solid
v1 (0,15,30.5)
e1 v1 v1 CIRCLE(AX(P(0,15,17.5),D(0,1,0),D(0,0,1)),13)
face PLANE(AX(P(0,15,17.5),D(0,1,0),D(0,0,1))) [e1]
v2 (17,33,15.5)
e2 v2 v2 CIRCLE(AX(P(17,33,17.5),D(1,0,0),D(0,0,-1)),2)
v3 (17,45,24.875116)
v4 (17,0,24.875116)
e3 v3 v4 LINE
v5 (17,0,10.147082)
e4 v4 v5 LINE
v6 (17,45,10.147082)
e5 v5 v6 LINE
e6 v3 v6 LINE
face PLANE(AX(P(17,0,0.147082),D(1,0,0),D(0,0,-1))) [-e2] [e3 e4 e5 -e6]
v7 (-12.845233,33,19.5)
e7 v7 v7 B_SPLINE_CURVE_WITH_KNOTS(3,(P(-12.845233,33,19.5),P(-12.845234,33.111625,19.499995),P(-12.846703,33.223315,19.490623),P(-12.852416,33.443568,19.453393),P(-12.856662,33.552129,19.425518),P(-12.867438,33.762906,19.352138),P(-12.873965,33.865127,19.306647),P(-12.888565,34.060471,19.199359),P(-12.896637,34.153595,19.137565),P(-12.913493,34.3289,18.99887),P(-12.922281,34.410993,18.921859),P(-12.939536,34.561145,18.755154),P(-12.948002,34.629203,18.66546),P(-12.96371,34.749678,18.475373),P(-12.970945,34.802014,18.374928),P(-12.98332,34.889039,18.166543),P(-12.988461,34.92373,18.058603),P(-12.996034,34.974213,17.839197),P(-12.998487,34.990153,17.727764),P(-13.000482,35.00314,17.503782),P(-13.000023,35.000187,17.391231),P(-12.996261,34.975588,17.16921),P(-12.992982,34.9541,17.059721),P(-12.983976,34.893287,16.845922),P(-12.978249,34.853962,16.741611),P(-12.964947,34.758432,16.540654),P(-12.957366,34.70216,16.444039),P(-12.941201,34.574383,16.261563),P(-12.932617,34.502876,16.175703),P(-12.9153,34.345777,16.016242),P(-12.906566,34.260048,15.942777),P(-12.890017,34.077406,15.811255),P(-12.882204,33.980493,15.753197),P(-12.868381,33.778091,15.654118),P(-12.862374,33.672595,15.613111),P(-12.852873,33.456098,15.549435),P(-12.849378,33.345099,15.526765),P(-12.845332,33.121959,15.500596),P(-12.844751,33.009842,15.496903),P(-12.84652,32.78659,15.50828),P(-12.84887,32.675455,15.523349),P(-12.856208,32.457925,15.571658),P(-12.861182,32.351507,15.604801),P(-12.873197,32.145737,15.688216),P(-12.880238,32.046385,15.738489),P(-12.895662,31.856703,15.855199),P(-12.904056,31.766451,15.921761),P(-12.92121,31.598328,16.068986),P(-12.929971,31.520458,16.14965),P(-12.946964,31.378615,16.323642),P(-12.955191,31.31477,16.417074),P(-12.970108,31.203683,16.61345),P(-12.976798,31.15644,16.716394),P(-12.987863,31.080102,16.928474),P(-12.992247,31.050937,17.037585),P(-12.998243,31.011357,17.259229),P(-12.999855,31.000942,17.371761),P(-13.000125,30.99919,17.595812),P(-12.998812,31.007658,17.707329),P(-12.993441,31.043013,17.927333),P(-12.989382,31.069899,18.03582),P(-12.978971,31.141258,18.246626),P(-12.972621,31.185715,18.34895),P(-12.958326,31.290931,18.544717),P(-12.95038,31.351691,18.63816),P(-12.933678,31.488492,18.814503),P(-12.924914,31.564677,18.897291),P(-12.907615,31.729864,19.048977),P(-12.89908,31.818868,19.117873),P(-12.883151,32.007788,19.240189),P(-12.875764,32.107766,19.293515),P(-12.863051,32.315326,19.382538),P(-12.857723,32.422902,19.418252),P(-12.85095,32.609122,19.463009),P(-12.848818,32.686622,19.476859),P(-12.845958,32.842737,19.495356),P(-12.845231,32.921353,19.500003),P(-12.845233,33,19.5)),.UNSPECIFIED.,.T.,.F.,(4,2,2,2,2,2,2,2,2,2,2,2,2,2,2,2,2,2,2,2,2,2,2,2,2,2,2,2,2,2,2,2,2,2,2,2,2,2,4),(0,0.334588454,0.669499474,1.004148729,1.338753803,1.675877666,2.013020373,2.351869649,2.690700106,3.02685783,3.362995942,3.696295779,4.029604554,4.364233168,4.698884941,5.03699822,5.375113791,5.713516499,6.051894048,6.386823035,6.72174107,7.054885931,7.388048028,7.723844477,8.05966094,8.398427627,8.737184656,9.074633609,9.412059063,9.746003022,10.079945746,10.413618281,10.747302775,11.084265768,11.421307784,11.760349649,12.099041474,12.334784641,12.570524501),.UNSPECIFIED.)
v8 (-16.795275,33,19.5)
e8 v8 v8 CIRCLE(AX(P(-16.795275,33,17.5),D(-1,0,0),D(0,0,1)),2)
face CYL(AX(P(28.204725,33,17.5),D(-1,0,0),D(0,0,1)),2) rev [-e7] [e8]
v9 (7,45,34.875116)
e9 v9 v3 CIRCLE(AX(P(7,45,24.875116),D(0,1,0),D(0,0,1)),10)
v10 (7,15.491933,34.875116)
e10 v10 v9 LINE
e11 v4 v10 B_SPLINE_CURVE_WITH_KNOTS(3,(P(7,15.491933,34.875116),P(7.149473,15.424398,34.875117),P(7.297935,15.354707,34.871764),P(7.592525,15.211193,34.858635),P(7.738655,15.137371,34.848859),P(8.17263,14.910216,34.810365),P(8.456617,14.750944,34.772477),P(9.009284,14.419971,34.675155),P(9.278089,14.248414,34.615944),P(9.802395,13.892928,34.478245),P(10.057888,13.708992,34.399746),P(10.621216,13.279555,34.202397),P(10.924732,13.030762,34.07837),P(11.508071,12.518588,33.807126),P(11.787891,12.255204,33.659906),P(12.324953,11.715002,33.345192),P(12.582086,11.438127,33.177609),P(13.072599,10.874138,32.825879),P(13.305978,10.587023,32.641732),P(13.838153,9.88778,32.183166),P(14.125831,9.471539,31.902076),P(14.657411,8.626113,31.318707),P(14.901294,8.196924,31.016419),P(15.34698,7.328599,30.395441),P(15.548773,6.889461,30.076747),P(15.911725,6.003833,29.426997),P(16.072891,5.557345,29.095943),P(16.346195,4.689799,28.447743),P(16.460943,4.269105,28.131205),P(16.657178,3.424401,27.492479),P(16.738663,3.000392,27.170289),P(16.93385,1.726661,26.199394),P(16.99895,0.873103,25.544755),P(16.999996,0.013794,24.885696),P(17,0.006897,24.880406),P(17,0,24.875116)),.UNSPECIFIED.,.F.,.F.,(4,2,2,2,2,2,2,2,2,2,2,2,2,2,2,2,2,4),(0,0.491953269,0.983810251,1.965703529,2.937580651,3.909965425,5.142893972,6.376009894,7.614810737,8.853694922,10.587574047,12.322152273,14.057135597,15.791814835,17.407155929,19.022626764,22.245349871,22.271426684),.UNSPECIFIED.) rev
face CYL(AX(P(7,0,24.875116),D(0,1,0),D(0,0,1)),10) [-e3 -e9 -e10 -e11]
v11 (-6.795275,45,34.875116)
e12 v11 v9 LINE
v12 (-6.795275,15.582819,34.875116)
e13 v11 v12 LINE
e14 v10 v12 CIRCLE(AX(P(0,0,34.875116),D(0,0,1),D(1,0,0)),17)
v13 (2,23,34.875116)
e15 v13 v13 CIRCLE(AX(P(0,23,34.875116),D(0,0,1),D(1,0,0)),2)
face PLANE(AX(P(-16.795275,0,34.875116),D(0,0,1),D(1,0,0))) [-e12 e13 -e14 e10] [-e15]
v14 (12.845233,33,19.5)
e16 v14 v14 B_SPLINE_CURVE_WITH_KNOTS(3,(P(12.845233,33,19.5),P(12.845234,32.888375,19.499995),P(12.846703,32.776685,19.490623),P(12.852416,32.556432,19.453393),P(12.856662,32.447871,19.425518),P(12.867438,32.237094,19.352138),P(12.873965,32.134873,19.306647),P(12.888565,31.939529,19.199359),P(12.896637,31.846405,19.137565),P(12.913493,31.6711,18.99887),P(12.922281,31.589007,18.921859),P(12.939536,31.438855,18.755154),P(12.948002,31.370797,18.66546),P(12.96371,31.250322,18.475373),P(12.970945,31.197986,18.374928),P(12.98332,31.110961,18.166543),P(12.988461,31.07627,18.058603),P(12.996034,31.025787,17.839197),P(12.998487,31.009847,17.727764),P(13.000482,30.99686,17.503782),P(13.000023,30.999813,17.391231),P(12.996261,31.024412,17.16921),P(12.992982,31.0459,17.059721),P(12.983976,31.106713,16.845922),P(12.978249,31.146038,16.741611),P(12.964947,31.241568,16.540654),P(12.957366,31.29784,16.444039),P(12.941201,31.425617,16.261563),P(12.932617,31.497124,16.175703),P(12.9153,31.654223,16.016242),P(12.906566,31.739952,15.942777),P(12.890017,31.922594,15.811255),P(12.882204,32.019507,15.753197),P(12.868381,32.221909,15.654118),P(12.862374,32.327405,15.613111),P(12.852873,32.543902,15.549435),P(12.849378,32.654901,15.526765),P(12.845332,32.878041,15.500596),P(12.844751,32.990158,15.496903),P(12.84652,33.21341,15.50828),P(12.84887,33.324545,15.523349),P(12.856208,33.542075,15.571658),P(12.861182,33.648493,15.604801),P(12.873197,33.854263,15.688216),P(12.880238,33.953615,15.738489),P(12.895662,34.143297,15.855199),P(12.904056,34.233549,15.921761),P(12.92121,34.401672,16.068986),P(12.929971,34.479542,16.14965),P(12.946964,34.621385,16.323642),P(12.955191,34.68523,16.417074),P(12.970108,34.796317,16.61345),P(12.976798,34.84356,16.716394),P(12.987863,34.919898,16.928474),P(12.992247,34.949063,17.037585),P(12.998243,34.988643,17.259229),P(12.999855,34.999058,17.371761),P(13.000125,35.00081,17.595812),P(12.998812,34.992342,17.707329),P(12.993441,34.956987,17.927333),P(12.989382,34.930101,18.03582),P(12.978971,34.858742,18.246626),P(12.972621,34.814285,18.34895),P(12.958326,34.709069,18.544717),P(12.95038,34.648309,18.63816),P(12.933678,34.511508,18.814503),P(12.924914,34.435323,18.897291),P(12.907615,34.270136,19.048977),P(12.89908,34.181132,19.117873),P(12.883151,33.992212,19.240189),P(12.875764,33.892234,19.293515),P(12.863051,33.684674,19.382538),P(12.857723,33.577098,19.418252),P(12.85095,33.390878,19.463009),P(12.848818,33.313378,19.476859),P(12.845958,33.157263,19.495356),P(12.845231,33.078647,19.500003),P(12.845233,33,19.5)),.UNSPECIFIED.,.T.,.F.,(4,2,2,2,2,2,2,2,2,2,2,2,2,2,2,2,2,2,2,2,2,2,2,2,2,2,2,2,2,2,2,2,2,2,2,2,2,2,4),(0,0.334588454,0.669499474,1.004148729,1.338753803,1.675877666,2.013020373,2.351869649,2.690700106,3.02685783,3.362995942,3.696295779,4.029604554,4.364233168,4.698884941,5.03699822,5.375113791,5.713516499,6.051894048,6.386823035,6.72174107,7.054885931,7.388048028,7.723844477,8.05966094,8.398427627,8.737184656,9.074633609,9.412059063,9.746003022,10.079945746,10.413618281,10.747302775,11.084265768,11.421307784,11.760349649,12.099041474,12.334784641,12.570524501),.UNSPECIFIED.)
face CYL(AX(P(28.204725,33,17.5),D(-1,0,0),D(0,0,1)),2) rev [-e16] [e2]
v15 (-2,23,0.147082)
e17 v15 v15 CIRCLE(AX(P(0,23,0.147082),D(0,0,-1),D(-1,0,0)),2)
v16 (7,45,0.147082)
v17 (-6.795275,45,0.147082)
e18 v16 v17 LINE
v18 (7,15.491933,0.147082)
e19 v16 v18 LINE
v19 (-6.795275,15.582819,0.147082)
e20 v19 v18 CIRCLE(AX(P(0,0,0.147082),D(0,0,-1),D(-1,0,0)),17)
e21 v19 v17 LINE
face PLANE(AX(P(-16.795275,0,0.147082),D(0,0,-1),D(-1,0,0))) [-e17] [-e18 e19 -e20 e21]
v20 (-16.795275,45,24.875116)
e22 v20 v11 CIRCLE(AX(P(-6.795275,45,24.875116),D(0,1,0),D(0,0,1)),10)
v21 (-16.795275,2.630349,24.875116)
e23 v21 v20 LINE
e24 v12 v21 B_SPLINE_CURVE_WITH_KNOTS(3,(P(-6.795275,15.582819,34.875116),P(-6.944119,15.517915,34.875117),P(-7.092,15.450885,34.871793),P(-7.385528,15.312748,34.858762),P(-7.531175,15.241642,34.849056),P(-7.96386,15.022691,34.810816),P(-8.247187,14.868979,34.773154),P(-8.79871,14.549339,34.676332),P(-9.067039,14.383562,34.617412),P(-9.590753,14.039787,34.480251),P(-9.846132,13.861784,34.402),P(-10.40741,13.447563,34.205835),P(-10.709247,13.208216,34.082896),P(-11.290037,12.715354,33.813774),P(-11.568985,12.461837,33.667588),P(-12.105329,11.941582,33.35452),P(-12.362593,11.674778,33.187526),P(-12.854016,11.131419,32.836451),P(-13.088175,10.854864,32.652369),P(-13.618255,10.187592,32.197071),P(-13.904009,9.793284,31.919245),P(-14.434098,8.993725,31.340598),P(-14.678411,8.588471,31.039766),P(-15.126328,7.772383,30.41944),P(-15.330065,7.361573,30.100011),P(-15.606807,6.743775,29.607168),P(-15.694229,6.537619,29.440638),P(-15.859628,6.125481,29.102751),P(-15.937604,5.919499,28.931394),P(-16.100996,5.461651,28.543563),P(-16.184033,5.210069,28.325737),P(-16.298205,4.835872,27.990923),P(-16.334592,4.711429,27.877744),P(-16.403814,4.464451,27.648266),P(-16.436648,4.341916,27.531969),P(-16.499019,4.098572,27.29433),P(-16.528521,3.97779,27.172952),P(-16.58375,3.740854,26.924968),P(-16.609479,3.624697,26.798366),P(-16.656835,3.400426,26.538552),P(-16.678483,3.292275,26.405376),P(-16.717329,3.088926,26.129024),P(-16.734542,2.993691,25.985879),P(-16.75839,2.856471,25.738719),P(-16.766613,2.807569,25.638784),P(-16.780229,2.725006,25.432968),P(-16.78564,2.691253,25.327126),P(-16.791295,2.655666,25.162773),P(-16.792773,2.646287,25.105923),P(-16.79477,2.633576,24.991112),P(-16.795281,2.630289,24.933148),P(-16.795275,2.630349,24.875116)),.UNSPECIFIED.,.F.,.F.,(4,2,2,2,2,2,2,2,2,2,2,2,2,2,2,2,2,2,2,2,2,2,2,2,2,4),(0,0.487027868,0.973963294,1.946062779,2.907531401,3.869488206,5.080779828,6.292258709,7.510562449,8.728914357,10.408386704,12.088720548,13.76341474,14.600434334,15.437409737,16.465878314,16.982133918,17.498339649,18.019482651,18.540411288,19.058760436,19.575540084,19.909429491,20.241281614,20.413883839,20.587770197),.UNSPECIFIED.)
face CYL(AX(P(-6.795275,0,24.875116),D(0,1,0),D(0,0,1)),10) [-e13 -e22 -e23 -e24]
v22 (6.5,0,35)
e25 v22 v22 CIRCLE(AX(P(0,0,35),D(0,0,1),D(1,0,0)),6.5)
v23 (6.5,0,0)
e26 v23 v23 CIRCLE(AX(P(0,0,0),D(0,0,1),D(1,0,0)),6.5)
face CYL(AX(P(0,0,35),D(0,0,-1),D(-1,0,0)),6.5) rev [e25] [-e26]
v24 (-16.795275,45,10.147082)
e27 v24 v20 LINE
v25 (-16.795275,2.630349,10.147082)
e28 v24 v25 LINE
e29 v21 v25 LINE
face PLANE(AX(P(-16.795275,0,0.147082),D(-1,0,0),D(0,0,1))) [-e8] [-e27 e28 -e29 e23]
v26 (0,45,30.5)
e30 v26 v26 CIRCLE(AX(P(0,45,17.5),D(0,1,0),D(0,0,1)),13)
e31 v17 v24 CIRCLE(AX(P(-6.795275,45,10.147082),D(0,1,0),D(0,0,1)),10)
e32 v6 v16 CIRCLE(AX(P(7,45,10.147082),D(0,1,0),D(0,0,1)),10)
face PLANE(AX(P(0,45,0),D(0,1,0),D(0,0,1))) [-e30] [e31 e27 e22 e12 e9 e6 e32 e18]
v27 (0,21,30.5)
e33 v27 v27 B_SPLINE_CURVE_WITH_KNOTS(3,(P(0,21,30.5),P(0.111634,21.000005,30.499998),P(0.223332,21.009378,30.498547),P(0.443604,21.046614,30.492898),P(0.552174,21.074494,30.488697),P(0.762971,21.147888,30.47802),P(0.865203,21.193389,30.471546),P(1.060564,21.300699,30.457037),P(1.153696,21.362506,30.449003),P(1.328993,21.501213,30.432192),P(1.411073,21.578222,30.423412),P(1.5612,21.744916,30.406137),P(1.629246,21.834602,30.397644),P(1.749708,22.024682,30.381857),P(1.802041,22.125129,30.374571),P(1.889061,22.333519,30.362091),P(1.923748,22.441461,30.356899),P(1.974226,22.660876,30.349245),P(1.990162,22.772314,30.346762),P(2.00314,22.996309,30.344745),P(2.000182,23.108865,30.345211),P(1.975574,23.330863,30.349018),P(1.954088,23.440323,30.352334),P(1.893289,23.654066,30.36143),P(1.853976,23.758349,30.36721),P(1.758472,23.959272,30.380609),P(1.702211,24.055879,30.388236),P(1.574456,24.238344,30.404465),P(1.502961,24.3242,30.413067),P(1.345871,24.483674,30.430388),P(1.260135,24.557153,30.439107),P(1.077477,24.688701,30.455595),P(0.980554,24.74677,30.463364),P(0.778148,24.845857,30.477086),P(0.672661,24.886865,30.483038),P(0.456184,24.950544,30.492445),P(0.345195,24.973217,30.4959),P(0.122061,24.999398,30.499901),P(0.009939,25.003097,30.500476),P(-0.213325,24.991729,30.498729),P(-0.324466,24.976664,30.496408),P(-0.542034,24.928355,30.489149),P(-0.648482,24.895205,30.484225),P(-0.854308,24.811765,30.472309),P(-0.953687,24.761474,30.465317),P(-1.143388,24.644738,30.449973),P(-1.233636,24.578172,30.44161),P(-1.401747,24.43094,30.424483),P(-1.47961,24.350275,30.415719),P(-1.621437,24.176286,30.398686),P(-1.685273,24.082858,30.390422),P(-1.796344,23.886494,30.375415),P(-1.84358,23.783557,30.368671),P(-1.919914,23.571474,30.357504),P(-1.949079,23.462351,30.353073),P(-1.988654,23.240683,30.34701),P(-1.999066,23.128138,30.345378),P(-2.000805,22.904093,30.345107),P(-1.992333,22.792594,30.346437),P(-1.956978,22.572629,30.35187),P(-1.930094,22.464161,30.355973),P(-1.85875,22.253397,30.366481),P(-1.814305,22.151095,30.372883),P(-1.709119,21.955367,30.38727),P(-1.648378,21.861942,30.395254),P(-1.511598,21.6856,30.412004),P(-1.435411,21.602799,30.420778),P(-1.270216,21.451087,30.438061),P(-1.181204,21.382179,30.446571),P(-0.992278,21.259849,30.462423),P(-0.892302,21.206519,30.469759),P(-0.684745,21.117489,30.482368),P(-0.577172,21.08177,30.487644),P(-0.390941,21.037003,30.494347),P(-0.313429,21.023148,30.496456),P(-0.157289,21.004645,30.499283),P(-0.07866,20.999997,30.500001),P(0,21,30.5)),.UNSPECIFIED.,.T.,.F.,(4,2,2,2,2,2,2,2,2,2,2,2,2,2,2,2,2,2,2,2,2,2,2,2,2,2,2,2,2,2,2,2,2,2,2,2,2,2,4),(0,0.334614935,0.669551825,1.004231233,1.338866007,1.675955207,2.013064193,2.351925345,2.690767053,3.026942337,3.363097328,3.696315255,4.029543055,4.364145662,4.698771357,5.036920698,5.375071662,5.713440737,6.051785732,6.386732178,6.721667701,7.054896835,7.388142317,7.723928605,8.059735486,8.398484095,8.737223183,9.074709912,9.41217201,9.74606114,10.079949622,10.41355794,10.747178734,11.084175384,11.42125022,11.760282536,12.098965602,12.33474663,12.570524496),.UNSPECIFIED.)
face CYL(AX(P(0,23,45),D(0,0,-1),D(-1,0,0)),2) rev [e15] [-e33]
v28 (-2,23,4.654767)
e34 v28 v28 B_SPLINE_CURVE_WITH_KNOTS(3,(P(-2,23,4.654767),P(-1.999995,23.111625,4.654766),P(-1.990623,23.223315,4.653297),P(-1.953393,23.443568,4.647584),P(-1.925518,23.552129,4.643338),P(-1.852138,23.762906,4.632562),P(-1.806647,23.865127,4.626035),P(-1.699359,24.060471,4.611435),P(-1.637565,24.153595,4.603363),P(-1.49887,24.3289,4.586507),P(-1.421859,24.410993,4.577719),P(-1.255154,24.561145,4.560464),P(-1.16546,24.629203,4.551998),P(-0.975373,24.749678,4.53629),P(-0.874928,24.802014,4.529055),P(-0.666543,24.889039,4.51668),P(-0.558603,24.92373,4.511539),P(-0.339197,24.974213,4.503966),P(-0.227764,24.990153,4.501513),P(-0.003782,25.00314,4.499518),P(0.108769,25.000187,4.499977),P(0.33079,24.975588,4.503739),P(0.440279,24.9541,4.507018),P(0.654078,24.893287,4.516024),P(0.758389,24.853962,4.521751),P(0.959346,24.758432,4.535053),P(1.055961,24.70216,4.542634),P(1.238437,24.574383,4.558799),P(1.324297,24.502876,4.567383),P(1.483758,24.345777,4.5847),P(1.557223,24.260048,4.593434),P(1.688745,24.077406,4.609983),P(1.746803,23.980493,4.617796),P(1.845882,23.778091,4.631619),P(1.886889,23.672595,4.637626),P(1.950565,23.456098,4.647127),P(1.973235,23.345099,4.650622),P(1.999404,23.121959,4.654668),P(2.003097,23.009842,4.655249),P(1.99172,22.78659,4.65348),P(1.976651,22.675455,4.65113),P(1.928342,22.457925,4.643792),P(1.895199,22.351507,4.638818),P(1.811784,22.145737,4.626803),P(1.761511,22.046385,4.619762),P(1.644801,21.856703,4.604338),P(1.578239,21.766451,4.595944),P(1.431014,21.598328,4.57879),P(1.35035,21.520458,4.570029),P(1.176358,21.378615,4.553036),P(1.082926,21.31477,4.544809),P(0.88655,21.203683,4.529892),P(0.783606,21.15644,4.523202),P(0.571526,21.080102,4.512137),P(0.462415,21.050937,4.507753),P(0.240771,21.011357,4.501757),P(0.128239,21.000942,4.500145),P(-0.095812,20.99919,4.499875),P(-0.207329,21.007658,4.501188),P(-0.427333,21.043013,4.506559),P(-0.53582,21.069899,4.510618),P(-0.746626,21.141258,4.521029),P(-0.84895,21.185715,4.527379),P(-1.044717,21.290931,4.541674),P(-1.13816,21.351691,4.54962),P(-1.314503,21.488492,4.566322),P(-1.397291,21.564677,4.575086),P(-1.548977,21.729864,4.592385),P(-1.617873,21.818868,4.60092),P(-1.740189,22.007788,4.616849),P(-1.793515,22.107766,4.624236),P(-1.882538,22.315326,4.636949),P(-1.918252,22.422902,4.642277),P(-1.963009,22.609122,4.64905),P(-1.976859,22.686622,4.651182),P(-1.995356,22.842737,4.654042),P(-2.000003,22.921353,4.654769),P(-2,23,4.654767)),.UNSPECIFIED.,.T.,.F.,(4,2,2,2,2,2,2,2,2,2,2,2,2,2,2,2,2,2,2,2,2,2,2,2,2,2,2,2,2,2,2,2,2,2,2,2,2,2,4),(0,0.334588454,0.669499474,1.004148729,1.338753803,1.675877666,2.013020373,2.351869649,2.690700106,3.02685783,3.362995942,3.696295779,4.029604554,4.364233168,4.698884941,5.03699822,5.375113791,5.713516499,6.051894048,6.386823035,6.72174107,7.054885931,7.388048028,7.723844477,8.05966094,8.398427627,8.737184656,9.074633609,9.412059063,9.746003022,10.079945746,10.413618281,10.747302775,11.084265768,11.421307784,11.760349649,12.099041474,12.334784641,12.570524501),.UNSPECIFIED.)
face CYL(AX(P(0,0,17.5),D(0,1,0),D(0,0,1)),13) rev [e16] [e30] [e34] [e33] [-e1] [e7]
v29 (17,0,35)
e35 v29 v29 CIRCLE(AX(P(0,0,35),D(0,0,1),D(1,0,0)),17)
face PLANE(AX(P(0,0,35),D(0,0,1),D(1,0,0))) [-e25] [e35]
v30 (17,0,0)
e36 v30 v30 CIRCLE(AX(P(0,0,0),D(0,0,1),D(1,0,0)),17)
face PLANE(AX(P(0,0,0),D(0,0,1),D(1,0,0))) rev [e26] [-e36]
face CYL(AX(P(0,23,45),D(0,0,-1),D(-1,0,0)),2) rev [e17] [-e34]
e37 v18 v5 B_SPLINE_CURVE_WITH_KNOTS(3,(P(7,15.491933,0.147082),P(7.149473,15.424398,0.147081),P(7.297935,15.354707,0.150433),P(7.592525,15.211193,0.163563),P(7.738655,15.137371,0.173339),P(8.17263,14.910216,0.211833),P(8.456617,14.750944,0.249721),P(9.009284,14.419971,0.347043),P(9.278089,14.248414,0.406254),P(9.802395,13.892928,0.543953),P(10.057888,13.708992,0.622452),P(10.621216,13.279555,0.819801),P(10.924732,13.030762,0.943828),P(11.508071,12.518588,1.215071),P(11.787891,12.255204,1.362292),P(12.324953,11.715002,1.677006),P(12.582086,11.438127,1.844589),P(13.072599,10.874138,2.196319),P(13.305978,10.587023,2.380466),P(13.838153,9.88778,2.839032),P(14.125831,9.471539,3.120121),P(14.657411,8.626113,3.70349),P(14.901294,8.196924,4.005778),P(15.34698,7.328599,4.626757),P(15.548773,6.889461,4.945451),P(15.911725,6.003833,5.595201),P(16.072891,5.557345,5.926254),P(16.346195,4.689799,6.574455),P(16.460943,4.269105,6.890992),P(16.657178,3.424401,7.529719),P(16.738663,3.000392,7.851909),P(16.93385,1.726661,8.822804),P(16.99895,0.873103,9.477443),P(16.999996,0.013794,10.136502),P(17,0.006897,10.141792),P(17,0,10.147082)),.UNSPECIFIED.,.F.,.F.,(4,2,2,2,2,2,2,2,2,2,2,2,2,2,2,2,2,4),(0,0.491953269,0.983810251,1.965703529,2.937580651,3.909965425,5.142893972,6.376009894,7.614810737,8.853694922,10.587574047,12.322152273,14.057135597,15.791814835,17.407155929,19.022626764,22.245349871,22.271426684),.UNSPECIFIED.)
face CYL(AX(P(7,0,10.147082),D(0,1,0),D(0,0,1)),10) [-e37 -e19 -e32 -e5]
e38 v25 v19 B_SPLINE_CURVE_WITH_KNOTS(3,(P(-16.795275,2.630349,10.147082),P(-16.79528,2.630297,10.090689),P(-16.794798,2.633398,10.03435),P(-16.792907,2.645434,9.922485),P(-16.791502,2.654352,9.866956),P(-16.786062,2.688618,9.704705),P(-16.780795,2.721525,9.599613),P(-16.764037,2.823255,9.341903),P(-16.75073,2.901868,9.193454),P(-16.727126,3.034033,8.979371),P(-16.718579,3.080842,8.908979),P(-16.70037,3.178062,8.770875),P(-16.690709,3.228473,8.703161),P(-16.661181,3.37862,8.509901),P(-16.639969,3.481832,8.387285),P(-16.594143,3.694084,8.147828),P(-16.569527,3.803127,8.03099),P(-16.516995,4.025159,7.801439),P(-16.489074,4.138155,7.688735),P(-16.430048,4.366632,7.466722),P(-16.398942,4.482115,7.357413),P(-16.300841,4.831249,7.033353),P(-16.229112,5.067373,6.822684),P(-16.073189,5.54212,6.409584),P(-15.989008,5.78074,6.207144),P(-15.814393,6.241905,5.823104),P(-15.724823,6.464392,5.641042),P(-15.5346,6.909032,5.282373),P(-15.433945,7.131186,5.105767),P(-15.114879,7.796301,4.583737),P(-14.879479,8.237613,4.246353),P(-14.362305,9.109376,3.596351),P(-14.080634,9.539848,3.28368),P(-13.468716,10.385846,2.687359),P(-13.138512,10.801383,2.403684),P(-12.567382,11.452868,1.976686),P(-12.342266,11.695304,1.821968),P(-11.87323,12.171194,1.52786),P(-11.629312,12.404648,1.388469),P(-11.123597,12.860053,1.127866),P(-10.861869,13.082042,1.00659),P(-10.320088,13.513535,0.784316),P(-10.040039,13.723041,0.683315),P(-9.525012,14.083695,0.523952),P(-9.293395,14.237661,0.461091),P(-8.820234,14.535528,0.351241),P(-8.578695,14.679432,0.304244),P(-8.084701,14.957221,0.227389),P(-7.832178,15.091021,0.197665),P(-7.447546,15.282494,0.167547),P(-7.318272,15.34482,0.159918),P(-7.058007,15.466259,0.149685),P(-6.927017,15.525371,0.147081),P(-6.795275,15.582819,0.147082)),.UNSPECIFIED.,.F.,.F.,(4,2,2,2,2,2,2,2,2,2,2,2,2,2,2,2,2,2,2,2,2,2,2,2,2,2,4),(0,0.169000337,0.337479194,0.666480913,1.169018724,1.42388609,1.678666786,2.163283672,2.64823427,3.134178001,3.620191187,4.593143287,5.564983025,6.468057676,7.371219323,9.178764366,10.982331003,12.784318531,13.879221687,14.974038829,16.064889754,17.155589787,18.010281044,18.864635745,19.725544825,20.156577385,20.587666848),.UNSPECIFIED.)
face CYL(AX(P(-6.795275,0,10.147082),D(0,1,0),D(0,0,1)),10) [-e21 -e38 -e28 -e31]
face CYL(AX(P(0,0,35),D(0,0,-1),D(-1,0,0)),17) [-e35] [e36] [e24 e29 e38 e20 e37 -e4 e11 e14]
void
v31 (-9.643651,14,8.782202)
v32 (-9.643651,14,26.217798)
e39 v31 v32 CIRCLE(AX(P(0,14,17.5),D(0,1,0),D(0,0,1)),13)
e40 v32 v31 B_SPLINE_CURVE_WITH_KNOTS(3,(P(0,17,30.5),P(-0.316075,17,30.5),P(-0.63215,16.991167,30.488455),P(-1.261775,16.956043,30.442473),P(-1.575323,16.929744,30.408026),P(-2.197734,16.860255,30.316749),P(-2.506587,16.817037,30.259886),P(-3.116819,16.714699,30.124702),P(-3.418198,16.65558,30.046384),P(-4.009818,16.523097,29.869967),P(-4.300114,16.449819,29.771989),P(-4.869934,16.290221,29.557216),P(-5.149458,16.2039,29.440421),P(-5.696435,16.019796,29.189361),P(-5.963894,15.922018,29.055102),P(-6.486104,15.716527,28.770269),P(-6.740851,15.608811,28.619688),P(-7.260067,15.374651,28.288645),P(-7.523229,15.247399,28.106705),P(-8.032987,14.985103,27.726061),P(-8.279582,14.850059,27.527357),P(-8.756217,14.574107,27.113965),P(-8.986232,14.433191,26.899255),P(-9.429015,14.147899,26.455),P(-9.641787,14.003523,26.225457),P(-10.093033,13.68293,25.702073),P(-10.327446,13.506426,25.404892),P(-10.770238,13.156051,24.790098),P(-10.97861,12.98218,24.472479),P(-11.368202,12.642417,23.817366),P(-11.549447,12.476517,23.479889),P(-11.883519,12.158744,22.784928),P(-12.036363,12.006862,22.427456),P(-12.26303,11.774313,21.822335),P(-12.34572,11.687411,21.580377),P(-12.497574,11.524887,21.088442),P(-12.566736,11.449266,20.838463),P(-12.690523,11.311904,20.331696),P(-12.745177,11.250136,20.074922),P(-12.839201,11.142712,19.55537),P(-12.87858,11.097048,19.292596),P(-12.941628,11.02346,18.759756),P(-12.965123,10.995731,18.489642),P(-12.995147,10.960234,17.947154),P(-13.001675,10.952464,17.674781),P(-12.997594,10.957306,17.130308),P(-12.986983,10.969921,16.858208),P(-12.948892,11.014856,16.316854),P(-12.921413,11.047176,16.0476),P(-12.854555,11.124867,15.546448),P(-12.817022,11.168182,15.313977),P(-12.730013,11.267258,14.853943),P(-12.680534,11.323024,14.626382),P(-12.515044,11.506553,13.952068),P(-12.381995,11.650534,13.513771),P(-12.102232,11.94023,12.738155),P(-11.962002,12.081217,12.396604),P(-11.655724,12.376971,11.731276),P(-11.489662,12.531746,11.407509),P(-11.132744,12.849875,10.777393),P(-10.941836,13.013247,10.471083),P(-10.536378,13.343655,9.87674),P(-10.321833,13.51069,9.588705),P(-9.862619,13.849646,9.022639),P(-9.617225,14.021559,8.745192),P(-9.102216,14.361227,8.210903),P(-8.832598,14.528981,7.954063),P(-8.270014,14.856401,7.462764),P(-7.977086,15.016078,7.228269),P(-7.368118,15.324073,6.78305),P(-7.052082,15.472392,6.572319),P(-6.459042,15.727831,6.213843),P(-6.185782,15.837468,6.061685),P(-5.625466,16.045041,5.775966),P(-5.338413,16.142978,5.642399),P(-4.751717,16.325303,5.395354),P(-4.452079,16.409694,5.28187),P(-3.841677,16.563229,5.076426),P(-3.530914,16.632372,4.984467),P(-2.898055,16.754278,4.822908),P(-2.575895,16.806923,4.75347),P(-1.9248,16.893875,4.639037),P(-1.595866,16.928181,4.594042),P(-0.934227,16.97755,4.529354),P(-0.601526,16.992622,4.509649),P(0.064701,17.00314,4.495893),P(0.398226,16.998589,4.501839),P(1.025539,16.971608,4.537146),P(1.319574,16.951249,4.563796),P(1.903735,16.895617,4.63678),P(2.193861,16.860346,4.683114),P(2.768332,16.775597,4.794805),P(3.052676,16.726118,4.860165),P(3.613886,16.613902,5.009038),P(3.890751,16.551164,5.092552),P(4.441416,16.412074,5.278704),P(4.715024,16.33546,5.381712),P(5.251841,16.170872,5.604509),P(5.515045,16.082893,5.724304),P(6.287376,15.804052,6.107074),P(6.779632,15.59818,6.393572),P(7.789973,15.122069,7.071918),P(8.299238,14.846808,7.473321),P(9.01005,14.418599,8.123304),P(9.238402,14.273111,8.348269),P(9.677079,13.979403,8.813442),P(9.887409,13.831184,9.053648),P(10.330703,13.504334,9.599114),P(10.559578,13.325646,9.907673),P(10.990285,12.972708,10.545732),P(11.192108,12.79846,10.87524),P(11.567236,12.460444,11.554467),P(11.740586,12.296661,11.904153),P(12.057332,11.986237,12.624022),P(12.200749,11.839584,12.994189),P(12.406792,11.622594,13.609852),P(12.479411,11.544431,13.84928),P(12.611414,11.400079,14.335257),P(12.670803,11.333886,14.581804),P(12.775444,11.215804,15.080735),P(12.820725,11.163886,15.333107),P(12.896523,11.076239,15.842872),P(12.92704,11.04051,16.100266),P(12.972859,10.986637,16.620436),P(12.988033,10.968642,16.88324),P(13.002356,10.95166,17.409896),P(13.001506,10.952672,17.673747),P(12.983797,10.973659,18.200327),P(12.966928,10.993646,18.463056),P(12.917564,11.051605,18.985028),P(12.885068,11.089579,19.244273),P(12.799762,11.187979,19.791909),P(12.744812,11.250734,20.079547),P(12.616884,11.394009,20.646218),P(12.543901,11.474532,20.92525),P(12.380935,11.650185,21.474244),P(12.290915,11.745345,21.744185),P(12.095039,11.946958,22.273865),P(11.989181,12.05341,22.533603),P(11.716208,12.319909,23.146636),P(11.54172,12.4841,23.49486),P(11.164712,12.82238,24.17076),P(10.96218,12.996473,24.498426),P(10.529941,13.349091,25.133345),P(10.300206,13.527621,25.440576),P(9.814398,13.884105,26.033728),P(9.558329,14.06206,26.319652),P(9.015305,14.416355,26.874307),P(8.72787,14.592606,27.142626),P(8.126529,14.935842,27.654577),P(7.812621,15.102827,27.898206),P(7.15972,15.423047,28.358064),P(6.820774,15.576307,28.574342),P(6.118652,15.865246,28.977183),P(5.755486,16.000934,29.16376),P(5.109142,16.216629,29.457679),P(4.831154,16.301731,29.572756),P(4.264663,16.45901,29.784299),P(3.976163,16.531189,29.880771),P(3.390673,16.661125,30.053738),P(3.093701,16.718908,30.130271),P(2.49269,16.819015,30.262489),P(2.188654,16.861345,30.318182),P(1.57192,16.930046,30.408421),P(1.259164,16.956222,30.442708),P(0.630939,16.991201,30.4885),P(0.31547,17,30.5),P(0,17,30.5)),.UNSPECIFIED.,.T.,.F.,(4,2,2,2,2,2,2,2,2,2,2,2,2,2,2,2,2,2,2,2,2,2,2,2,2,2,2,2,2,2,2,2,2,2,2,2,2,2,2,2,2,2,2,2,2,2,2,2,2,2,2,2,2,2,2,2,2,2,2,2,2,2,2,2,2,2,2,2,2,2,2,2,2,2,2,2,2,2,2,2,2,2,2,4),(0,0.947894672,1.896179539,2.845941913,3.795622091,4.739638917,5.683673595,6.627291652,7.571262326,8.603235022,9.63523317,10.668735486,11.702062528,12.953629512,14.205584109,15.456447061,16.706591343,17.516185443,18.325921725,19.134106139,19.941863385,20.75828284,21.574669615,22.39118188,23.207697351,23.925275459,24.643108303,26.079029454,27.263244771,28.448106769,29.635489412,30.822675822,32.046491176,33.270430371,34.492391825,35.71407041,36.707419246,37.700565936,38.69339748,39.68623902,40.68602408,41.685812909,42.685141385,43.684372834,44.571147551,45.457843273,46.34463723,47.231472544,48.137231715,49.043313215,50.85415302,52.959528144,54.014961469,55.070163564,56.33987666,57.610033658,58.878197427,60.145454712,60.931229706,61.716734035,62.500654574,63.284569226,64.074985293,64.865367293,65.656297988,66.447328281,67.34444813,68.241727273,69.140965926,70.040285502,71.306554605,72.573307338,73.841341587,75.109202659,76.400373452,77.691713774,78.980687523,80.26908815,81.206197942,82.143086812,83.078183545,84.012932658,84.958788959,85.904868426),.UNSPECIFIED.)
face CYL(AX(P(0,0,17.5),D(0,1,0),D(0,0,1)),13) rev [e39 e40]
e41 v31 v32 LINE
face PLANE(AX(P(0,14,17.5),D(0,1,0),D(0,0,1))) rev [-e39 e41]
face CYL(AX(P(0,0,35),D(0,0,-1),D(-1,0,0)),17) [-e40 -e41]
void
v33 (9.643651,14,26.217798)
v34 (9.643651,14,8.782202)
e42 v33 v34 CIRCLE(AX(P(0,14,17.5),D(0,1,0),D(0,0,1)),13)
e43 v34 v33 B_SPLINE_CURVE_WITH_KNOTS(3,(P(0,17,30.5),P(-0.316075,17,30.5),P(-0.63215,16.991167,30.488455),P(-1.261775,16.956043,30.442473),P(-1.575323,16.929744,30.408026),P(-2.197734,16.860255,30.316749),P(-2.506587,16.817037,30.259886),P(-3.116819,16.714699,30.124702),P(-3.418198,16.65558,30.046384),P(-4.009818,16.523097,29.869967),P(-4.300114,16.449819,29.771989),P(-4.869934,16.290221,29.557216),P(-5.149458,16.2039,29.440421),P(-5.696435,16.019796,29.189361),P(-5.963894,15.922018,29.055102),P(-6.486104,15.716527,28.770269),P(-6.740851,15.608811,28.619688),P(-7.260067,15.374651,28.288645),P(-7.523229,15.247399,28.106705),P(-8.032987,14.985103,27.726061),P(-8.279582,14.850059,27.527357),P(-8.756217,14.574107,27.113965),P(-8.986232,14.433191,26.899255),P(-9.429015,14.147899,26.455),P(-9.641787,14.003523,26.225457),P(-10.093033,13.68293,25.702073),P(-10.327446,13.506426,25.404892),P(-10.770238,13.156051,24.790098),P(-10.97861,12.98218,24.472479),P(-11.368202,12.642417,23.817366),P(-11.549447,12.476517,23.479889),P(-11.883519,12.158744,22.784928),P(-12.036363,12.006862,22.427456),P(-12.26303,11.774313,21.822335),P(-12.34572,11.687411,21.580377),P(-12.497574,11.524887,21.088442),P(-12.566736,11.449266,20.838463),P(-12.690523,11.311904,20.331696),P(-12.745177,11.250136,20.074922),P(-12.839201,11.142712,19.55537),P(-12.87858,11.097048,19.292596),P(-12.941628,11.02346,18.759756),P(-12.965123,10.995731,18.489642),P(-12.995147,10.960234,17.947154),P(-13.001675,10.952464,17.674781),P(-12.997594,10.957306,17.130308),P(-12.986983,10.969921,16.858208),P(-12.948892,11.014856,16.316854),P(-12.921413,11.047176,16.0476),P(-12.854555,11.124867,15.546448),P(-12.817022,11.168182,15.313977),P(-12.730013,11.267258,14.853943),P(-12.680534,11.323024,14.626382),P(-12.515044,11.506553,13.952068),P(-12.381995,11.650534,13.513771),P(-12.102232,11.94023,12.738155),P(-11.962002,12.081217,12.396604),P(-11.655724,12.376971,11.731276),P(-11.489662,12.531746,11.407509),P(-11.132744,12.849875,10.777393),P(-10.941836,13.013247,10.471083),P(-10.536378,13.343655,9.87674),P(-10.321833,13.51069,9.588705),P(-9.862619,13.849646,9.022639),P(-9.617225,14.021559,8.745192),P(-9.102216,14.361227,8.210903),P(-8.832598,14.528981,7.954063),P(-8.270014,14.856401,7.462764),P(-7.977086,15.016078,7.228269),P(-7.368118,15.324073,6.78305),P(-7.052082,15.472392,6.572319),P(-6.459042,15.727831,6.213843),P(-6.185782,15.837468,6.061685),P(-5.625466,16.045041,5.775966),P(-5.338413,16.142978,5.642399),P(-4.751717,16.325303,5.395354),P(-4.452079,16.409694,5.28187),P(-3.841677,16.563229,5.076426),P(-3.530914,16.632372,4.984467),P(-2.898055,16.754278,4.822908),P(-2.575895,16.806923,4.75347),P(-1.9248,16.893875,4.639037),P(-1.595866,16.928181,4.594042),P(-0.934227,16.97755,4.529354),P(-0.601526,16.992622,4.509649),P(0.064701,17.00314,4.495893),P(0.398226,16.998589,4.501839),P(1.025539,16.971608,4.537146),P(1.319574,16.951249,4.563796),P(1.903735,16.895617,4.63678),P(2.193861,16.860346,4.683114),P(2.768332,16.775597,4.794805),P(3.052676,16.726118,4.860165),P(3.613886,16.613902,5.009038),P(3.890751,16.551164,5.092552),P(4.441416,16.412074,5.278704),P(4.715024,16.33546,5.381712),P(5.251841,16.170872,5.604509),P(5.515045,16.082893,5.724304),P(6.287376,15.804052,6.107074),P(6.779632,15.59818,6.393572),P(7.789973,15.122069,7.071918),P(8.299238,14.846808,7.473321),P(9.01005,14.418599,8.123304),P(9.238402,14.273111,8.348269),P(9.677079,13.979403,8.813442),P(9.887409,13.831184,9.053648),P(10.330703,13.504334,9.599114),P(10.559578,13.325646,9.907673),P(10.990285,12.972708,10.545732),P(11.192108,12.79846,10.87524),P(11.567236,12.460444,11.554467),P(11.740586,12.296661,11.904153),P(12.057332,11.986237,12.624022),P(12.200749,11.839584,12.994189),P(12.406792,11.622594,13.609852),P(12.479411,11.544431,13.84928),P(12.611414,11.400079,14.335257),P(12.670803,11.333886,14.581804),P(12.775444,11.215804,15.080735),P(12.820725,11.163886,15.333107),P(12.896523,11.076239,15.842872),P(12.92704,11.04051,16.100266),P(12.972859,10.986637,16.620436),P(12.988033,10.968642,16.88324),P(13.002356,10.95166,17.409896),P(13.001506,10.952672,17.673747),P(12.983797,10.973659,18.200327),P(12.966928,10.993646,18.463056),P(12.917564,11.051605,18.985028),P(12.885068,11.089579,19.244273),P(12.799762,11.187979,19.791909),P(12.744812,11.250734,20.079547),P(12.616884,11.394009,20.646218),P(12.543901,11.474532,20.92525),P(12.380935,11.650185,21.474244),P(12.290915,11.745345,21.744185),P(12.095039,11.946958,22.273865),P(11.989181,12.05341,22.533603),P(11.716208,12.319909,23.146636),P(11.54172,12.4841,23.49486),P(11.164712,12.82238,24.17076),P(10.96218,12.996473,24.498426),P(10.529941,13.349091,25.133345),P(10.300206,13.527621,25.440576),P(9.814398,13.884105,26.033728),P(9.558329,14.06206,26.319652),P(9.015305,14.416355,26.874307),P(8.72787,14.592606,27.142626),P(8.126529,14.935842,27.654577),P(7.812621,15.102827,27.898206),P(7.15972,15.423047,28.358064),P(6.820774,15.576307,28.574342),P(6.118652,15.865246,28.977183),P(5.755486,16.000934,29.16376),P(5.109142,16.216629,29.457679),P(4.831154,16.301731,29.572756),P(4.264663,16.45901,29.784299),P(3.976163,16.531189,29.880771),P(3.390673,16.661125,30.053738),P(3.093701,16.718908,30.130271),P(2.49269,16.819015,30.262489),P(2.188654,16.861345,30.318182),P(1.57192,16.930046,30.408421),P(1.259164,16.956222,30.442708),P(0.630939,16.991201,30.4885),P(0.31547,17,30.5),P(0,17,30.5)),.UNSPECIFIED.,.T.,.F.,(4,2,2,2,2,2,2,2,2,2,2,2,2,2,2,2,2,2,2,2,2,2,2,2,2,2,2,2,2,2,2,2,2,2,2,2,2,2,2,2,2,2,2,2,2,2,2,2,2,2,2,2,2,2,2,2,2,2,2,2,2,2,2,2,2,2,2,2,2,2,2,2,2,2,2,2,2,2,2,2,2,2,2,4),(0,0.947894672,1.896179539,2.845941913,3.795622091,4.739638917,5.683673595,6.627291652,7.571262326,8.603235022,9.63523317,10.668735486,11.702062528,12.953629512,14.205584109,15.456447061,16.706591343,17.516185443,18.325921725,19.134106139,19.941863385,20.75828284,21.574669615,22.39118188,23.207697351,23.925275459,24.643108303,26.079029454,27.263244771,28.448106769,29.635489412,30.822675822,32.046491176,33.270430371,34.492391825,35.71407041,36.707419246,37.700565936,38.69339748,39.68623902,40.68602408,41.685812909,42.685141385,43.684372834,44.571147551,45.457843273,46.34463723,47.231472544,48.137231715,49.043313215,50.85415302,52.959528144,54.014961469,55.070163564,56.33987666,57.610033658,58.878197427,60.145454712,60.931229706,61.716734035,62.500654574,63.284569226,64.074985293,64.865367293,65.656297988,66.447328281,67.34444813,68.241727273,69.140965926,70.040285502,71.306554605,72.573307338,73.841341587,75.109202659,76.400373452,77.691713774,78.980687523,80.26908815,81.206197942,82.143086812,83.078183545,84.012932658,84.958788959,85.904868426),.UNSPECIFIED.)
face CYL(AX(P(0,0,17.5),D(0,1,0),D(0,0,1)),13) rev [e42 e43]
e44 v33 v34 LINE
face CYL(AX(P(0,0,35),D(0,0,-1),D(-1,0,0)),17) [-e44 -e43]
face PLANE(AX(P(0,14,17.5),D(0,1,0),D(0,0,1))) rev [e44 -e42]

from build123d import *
from build123d.topology import SkipClean

# Parameters (mm, degrees)
SKETCH_1_R           = 17
SKETCH_1_R_2         = 6.5
EXTRUDE_2_DEPTH      = 35
SKETCH_3_W           = 33.795275063
SKETCH_3_H           = 34.72803434
SKETCH_3_R           = 13
EXTRUDE_7_DEPTH      = 45
SKETCH_4_R           = 6.5
CUT_EXTRUDE_1_DEPTH  = 60.489495005
SKETCH_12_R          = 2
CUT_EXTRUDE_11_DEPTH = 45
SKETCH_15_R          = 2
CUT_EXTRUDE_12_DEPTH = 45
FILLET_4_R           = 10
SKETCH_20_R          = 13
CUT_EXTRUDE_18_DEPTH = 31
EXTRUDE_START        = 1
SKETCH_25_R          = 13
EXTRUDE_10_DEPTH     = 1


with BuildPart() as part:
    # Эскиз1 → Бобышка-Вытянуть2 (new body)
    with BuildSketch(Plane.XY):
        Circle(SKETCH_1_R)
        Circle(SKETCH_1_R_2, mode=Mode.SUBTRACT)
    extrude(amount=EXTRUDE_2_DEPTH)

    # Эскиз3 → Бобышка-Вытянуть7 (add)
    with BuildSketch(Plane(origin=(0, 45, 0), x_dir=(1, 0, 0), z_dir=(0, 1, 0))):
        with Locations((0.102362468, -17.511098906)):
            Rectangle(SKETCH_3_W, SKETCH_3_H)
        with Locations(Location((0, -17.5, 0), (0, 0, 270))):
            Circle(SKETCH_3_R, mode=Mode.SUBTRACT)
    extrude(amount=-EXTRUDE_7_DEPTH)

    # Эскиз4 → Вырез-Вытянуть1 (cut, through all)
    with BuildSketch(Plane(origin=(0, 0, 0), x_dir=(-1, 0, 0), z_dir=(0, 0, -1))):
        with Locations(Location((0, 0, 0), (0, 0, 180))):
            Circle(SKETCH_4_R)
    extrude(amount=-CUT_EXTRUDE_1_DEPTH, mode=Mode.SUBTRACT)

    # Эскиз12 → Вырез-Вытянуть11 (cut)
    with BuildSketch(Plane(origin=(0, 0, 0), x_dir=(-1, 0, 0), z_dir=(0, 0, -1))):
        with Locations((0, 23)):
            Circle(SKETCH_12_R)
    extrude(amount=-CUT_EXTRUDE_11_DEPTH, mode=Mode.SUBTRACT)

    # Эскиз15 → Вырез-Вытянуть12 (cut)
    with BuildSketch(Plane.ZY.offset(16.795275063)):
        with Locations((17.5, 33)):
            Circle(SKETCH_15_R)
    extrude(amount=-CUT_EXTRUDE_12_DEPTH, mode=Mode.SUBTRACT)

    # Скругление4
    # the kernel refuses this fillet: 10 mm, written as the material it takes off along each edge
    with BuildSketch(Plane(origin=(-16.795275063, 70, 34.875116076), x_dir=(1, 0, 0), z_dir=(0, -1, 0))) as fillet_4_piece_1_section:
        with BuildLine():
            CenterArc((FILLET_4_R, -FILLET_4_R), FILLET_4_R, 90, 90)
            Line((0, -FILLET_4_R), (0, 0))
            Line((0, 0), (FILLET_4_R, 0))
        make_face()
    fillet_4_piece_1 = extrude(amount=92.369651061, mode=Mode.PRIVATE)
    fillet_4_piece_1 = fillet_4_piece_1 - Plane(origin=(0, 0, 32.54483178), x_dir=(1, 0, 0), z_dir=(0, 0, -1)) * Cylinder(17, 225, mode=Mode.PRIVATE)
    add(fillet_4_piece_1, mode=Mode.SUBTRACT)
    with BuildSketch(Plane(origin=(17, 70, 0.147081736), x_dir=(0, 0, 1), z_dir=(0, -1, 0))) as fillet_4_piece_2_section:
        with BuildLine():
            CenterArc((FILLET_4_R, FILLET_4_R), FILLET_4_R, 180, 90)
            Line((0, FILLET_4_R), (0, 0))
            Line((0, 0), (FILLET_4_R, 0))
        make_face()
    fillet_4_piece_2 = extrude(amount=95, mode=Mode.PRIVATE)
    fillet_4_piece_2 = fillet_4_piece_2 - Plane(origin=(0, 0, 2.486350956), x_dir=(1, 0, 0), z_dir=(0, 0, -1)) * Cylinder(17, 230, mode=Mode.PRIVATE)
    add(fillet_4_piece_2, mode=Mode.SUBTRACT)
    with BuildSketch(Plane(origin=(17, 70, 34.875116076), x_dir=(0, 0, -1), z_dir=(0, -1, 0))) as fillet_4_piece_3_section:
        with BuildLine():
            CenterArc((FILLET_4_R, -FILLET_4_R), FILLET_4_R, 90, 90)
            Line((0, -FILLET_4_R), (0, 0))
            Line((0, 0), (FILLET_4_R, 0))
        make_face()
    fillet_4_piece_3 = extrude(amount=95, mode=Mode.PRIVATE)
    fillet_4_piece_3 = fillet_4_piece_3 - Plane(origin=(0, 0, 32.535846855), x_dir=(1, 0, 0), z_dir=(0, 0, -1)) * Cylinder(17, 230, mode=Mode.PRIVATE)
    add(fillet_4_piece_3, mode=Mode.SUBTRACT)
    with BuildSketch(Plane(origin=(-16.795275063, 70, 0.147081736), x_dir=(0, 0, 1), z_dir=(0, -1, 0))) as fillet_4_piece_4_section:
        with BuildLine():
            CenterArc((FILLET_4_R, -FILLET_4_R), FILLET_4_R, 90, 90)
            Line((0, -FILLET_4_R), (0, 0))
            Line((0, 0), (FILLET_4_R, 0))
        make_face()
    fillet_4_piece_4 = extrude(amount=92.369651061, mode=Mode.PRIVATE)
    fillet_4_piece_4 = fillet_4_piece_4 - Plane(origin=(0, 0, 2.477367304), x_dir=(1, 0, 0), z_dir=(0, 0, -1)) * Cylinder(17, 225, mode=Mode.PRIVATE)
    add(fillet_4_piece_4, mode=Mode.SUBTRACT)

    # Эскиз20 → Вырез-Вытянуть18 (cut)
    with SkipClean():  # the faces are left unmerged after this step: merging them gives an invalid solid
        with BuildSketch(Plane(origin=(0, 45, 0), x_dir=(1, 0, 0), z_dir=(0, 1, 0))):
            with Locations(Location((0, -17.5, 0), (0, 0, 270))):
                Circle(SKETCH_20_R)
        extrude(amount=-CUT_EXTRUDE_18_DEPTH, mode=Mode.SUBTRACT)

    # Эскиз25 → Бобышка-Вытянуть10 (add)
    with BuildSketch(Plane(origin=(0, 14, 0), x_dir=(1, 0, 0), z_dir=(0, 1, 0)).offset(EXTRUDE_START)):
        with Locations(Location((0, -17.5, 0), (0, 0, 270))):
            Circle(SKETCH_25_R)
    extrude(amount=-EXTRUDE_10_DEPTH)


solid = part.part
